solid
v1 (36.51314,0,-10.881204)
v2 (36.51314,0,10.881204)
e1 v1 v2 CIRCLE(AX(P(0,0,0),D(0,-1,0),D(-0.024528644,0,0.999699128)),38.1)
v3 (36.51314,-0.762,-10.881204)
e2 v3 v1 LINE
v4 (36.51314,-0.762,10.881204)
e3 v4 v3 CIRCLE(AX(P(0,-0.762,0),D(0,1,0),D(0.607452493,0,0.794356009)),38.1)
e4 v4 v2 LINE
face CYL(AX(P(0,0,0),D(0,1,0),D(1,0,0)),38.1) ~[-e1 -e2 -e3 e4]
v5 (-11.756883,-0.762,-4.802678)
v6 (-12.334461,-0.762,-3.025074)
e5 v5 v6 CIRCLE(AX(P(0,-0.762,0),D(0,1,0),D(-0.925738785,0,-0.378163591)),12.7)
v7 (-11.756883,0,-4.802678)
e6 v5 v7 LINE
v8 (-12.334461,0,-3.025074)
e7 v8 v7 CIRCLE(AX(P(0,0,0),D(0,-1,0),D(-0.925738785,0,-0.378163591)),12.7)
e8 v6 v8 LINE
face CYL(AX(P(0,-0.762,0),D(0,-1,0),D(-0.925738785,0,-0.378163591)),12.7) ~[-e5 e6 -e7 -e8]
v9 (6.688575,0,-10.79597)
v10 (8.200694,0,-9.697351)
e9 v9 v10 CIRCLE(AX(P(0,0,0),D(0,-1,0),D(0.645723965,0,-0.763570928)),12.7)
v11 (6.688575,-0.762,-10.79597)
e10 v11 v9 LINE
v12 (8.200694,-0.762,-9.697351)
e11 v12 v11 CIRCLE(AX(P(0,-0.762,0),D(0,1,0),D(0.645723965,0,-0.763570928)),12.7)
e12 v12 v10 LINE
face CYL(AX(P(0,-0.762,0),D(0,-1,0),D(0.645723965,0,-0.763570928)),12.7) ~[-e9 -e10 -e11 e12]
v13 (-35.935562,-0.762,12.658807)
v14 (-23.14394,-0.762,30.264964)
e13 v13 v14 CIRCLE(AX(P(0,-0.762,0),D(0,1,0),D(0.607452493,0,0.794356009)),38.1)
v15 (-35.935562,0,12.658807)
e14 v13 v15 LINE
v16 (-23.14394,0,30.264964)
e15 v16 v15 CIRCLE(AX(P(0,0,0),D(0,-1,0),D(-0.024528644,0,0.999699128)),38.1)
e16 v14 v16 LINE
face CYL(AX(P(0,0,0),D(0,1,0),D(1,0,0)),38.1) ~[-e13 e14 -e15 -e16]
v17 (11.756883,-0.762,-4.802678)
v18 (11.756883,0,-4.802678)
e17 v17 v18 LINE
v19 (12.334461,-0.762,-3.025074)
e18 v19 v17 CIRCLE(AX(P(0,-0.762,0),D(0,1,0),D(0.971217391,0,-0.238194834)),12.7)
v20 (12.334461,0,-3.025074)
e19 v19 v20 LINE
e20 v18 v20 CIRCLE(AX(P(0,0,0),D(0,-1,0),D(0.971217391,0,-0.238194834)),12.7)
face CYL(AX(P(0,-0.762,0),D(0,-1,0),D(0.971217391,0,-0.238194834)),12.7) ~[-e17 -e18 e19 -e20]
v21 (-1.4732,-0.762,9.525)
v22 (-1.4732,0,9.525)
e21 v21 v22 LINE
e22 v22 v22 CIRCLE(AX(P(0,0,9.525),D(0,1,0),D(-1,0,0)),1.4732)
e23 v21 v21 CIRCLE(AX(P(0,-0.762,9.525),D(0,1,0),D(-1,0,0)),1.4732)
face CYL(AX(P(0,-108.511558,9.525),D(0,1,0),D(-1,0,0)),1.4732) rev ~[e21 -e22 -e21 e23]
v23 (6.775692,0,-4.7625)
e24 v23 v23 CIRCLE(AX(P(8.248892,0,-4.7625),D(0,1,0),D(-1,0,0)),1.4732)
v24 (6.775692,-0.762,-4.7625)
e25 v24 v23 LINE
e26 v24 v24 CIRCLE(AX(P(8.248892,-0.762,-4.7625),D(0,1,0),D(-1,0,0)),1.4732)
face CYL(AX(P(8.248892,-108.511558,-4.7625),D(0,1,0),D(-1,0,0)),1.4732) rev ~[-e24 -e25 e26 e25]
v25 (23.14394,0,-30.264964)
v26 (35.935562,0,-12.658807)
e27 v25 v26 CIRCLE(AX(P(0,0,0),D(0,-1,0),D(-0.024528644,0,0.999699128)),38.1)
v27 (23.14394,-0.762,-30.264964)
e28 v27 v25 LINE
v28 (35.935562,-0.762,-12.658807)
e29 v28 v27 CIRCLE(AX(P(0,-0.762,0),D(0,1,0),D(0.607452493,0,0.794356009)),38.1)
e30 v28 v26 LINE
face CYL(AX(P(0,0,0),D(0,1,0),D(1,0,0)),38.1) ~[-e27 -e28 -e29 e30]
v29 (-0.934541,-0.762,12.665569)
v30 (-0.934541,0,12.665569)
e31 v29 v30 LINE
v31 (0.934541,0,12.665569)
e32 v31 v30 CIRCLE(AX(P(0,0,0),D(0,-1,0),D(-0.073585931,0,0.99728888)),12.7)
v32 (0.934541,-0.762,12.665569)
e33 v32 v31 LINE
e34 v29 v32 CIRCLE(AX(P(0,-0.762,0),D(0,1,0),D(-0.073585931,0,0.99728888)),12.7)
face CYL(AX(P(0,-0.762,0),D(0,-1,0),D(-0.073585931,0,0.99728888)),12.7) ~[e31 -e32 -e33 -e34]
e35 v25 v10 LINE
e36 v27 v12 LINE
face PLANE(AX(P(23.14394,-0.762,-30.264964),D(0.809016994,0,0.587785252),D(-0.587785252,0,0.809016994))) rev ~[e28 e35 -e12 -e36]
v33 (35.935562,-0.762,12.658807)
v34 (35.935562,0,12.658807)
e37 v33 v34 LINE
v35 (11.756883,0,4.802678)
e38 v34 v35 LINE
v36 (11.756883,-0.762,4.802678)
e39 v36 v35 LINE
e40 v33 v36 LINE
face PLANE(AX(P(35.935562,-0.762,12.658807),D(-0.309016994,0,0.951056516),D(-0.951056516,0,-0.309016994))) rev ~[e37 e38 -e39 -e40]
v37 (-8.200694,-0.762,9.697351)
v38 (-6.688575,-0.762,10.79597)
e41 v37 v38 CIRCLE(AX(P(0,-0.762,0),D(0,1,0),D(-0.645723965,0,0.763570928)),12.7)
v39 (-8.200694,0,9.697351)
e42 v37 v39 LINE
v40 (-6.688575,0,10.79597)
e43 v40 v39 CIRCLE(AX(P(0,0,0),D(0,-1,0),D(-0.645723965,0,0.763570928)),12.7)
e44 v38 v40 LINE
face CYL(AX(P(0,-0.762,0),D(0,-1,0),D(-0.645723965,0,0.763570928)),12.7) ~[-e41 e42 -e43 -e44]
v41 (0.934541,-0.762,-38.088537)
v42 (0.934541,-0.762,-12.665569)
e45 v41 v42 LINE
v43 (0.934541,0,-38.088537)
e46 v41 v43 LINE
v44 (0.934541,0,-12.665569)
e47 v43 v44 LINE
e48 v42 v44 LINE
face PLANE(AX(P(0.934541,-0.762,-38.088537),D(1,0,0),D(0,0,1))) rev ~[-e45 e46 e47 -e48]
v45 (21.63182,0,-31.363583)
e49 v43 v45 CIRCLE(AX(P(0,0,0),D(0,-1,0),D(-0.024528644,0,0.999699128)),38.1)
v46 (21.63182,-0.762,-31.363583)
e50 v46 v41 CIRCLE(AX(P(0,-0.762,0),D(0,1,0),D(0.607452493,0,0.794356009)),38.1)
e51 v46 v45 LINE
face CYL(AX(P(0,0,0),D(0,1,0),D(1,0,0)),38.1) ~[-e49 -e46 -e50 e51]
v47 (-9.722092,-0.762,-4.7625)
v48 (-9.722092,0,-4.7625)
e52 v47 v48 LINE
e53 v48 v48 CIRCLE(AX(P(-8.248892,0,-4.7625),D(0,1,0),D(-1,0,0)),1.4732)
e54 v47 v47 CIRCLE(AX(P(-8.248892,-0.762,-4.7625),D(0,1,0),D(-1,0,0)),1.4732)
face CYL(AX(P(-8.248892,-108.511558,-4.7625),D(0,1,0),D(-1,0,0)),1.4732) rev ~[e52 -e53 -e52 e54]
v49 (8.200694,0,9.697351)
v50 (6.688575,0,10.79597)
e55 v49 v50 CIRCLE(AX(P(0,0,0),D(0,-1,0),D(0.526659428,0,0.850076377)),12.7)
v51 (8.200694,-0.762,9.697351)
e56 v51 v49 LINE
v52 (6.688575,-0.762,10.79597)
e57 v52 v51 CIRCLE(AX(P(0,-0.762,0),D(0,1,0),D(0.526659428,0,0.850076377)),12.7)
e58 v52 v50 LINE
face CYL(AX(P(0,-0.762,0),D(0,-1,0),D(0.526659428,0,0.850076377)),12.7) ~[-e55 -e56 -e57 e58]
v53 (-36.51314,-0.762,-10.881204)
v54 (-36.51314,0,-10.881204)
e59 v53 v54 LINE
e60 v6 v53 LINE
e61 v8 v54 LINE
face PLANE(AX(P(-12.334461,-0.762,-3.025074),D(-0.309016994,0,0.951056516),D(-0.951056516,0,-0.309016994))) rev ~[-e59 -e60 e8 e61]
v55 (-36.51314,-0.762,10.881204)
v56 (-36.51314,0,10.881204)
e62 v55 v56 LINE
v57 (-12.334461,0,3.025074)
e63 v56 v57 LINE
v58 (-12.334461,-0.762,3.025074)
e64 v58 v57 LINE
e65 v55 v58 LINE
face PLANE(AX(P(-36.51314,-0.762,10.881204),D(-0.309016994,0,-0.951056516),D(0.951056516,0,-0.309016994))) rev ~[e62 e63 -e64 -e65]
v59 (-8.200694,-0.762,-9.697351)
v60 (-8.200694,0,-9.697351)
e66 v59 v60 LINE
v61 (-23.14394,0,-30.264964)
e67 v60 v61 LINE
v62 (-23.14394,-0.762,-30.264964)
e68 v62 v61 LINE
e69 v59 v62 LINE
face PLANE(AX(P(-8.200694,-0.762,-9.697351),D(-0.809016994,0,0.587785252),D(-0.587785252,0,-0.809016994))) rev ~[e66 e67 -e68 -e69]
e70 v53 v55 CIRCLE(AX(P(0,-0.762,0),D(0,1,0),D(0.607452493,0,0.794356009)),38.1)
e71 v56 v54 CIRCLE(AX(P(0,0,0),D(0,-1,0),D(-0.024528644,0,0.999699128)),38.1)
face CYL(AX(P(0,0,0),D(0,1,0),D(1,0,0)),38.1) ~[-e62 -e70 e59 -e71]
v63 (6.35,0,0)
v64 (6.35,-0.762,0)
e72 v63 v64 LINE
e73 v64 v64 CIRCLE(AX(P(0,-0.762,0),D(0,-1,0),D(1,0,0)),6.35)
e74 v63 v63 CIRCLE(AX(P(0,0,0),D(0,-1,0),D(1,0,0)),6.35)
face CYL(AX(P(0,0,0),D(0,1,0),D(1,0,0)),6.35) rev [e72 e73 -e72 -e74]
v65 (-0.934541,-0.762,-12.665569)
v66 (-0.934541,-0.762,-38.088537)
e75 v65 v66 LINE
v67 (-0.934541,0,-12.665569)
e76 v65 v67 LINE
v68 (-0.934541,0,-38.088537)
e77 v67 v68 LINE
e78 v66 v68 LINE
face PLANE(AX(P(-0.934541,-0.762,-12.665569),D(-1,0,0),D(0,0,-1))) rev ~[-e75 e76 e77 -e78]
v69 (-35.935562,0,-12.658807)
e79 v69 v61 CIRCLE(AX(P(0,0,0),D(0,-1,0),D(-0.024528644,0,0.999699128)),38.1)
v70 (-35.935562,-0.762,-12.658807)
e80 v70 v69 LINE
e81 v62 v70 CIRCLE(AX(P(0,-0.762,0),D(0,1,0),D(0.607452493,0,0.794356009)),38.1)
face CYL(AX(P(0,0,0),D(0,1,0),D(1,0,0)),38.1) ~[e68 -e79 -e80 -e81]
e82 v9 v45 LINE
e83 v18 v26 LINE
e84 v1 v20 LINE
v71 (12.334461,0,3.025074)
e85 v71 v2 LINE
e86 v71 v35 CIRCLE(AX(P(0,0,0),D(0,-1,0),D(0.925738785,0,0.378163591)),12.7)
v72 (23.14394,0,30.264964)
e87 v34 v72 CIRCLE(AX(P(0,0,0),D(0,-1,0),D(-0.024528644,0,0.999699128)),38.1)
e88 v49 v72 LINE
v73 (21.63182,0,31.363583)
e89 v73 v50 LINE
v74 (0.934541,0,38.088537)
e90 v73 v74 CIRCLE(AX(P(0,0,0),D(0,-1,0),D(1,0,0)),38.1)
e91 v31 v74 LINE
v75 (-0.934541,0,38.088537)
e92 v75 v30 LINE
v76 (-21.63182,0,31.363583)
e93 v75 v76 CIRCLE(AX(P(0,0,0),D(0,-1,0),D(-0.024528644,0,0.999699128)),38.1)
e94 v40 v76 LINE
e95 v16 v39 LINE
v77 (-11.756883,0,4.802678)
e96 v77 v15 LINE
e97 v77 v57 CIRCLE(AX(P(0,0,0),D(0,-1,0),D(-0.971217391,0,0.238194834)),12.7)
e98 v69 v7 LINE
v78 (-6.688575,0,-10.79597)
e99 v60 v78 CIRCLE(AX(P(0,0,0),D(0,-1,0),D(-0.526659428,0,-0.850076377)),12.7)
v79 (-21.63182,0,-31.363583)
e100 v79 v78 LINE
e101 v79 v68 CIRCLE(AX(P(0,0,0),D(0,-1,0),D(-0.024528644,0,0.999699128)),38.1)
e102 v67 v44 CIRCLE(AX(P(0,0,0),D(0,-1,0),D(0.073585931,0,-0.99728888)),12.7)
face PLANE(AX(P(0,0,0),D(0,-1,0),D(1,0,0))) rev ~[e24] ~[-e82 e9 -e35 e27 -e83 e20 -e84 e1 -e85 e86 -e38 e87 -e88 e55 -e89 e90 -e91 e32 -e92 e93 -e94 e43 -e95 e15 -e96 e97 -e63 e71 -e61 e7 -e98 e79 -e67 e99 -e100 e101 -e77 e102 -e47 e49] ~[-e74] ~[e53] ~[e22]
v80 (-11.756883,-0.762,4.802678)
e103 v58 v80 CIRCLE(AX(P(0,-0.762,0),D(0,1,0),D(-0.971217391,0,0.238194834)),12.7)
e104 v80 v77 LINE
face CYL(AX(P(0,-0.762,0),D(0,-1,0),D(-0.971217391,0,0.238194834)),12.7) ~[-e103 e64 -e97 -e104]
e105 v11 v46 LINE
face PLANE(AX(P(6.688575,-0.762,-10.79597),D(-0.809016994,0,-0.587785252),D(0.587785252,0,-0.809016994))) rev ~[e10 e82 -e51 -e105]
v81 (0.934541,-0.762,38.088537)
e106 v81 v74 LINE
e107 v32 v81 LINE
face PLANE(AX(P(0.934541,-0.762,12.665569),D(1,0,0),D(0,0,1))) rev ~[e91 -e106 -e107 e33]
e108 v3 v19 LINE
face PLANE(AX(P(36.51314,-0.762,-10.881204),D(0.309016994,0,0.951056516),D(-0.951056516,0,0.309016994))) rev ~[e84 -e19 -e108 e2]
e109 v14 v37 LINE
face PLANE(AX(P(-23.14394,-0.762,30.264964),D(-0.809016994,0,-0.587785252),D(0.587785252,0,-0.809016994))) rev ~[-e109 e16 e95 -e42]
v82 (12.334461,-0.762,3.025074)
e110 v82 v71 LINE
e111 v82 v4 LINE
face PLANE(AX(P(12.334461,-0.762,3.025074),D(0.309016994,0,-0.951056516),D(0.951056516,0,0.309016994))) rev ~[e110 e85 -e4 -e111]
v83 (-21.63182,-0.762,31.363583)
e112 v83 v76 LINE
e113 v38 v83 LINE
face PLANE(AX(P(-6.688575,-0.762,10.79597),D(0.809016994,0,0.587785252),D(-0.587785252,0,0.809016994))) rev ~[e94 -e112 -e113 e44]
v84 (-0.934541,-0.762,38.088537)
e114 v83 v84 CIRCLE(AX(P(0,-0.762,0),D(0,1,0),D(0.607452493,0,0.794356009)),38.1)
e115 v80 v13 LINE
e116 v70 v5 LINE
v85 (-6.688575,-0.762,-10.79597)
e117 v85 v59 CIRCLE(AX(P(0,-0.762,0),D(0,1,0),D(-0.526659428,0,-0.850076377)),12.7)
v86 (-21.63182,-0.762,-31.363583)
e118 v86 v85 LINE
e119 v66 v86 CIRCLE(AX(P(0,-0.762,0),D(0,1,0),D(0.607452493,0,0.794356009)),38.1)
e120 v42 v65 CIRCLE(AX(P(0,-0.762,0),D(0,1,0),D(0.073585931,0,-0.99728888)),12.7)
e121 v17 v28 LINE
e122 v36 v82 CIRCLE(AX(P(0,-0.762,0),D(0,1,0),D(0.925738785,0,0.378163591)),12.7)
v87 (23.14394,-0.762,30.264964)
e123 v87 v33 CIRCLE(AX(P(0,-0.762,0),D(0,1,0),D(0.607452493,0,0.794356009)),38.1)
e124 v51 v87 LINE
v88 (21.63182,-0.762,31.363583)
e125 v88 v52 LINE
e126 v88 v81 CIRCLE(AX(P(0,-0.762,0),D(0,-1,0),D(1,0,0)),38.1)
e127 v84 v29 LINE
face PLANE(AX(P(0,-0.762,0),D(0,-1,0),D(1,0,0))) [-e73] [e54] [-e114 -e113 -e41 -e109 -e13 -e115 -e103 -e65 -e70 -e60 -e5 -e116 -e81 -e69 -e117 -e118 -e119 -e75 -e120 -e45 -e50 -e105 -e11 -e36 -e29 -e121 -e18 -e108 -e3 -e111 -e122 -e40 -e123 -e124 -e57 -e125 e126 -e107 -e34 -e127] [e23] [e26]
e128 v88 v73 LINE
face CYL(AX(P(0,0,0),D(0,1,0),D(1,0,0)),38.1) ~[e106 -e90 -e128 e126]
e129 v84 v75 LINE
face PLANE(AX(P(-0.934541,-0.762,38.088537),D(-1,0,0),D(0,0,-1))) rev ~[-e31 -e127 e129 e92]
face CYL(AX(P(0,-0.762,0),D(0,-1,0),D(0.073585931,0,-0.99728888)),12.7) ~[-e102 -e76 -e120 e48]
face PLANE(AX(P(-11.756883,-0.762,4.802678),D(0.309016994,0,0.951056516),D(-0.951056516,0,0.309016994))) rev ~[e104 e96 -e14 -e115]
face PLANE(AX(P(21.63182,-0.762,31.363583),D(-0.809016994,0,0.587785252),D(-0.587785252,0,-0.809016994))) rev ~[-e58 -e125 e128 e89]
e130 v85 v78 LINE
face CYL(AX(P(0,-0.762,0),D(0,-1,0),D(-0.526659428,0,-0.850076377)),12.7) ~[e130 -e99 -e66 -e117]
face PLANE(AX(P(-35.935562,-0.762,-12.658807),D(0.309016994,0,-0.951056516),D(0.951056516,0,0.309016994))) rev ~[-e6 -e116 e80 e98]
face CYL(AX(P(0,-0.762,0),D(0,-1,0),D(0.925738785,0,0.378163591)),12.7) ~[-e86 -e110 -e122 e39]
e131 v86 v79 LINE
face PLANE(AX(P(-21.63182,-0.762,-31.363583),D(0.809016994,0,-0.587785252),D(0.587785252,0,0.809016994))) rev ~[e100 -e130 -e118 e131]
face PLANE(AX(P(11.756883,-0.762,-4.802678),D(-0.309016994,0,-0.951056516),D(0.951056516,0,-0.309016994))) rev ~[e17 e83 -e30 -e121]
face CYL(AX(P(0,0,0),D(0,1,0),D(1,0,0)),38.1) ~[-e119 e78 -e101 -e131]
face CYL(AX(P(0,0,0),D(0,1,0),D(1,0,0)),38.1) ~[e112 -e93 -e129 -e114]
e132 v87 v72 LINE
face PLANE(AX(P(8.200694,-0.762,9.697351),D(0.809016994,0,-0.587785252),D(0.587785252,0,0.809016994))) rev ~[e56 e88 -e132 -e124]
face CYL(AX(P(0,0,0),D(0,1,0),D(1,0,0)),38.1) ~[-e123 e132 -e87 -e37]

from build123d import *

# Parameters (mm, degrees)
F0_R            = 38.1
F0_R_2          = 6.35
F1_DEPTH        = 0.762
F3_DEPTH        = 0.763
F3_COPIES_COUNT = 10
F5_D            = 2.9464


# Not quite as in the source:
# - a pattern or mirror of a feature is missing from the dataset's text; its kind, count and spacing are read off the source's solid


with BuildPart() as f1:
    # F0 (on Front) → F1 (new body)
    with BuildSketch(Plane.XZ):
        Circle(F0_R)
        Circle(F0_R_2, mode=Mode.SUBTRACT)
    extrude(amount=F1_DEPTH)

    # F2 (on face) → F3 (cut, through all)
    with BuildSketch(Plane.XZ.offset(0.762)):
        with BuildLine():
            Line((-0.9345413193, 38.0885367601), (-0.9345413193, 12.6655687801))
            ThreePointArc((-0.9345413193, 12.6655687801), (0, 12.7), (0.9345413193, 12.6655687801))
            Line((0.9345413193, 12.6655687801), (0.9345413193, 38.0885367601))
            ThreePointArc((0.9345413193, 38.0885367601), (0, 38.1), (-0.9345413193, 38.0885367601))
        make_face()
    f3 = extrude(amount=-F3_DEPTH, mode=Mode.SUBTRACT)

    # F3_copies: F3 ×10 about axis
    f3_copies_axis = Axis((0, 0, 0), (0, 1, 0))
    for i in range(1, F3_COPIES_COUNT):
        add(f3.rotate(f3_copies_axis, i * 360 / F3_COPIES_COUNT), mode=Mode.SUBTRACT)

    # F5 (through all)
    with Locations(Plane.XZ.offset(0.762)):
        with Locations((0, 9.525), (-8.248891971, -4.7625), (8.248891971, -4.7625)):
            Hole(F5_D / 2)


solid = f1.part
